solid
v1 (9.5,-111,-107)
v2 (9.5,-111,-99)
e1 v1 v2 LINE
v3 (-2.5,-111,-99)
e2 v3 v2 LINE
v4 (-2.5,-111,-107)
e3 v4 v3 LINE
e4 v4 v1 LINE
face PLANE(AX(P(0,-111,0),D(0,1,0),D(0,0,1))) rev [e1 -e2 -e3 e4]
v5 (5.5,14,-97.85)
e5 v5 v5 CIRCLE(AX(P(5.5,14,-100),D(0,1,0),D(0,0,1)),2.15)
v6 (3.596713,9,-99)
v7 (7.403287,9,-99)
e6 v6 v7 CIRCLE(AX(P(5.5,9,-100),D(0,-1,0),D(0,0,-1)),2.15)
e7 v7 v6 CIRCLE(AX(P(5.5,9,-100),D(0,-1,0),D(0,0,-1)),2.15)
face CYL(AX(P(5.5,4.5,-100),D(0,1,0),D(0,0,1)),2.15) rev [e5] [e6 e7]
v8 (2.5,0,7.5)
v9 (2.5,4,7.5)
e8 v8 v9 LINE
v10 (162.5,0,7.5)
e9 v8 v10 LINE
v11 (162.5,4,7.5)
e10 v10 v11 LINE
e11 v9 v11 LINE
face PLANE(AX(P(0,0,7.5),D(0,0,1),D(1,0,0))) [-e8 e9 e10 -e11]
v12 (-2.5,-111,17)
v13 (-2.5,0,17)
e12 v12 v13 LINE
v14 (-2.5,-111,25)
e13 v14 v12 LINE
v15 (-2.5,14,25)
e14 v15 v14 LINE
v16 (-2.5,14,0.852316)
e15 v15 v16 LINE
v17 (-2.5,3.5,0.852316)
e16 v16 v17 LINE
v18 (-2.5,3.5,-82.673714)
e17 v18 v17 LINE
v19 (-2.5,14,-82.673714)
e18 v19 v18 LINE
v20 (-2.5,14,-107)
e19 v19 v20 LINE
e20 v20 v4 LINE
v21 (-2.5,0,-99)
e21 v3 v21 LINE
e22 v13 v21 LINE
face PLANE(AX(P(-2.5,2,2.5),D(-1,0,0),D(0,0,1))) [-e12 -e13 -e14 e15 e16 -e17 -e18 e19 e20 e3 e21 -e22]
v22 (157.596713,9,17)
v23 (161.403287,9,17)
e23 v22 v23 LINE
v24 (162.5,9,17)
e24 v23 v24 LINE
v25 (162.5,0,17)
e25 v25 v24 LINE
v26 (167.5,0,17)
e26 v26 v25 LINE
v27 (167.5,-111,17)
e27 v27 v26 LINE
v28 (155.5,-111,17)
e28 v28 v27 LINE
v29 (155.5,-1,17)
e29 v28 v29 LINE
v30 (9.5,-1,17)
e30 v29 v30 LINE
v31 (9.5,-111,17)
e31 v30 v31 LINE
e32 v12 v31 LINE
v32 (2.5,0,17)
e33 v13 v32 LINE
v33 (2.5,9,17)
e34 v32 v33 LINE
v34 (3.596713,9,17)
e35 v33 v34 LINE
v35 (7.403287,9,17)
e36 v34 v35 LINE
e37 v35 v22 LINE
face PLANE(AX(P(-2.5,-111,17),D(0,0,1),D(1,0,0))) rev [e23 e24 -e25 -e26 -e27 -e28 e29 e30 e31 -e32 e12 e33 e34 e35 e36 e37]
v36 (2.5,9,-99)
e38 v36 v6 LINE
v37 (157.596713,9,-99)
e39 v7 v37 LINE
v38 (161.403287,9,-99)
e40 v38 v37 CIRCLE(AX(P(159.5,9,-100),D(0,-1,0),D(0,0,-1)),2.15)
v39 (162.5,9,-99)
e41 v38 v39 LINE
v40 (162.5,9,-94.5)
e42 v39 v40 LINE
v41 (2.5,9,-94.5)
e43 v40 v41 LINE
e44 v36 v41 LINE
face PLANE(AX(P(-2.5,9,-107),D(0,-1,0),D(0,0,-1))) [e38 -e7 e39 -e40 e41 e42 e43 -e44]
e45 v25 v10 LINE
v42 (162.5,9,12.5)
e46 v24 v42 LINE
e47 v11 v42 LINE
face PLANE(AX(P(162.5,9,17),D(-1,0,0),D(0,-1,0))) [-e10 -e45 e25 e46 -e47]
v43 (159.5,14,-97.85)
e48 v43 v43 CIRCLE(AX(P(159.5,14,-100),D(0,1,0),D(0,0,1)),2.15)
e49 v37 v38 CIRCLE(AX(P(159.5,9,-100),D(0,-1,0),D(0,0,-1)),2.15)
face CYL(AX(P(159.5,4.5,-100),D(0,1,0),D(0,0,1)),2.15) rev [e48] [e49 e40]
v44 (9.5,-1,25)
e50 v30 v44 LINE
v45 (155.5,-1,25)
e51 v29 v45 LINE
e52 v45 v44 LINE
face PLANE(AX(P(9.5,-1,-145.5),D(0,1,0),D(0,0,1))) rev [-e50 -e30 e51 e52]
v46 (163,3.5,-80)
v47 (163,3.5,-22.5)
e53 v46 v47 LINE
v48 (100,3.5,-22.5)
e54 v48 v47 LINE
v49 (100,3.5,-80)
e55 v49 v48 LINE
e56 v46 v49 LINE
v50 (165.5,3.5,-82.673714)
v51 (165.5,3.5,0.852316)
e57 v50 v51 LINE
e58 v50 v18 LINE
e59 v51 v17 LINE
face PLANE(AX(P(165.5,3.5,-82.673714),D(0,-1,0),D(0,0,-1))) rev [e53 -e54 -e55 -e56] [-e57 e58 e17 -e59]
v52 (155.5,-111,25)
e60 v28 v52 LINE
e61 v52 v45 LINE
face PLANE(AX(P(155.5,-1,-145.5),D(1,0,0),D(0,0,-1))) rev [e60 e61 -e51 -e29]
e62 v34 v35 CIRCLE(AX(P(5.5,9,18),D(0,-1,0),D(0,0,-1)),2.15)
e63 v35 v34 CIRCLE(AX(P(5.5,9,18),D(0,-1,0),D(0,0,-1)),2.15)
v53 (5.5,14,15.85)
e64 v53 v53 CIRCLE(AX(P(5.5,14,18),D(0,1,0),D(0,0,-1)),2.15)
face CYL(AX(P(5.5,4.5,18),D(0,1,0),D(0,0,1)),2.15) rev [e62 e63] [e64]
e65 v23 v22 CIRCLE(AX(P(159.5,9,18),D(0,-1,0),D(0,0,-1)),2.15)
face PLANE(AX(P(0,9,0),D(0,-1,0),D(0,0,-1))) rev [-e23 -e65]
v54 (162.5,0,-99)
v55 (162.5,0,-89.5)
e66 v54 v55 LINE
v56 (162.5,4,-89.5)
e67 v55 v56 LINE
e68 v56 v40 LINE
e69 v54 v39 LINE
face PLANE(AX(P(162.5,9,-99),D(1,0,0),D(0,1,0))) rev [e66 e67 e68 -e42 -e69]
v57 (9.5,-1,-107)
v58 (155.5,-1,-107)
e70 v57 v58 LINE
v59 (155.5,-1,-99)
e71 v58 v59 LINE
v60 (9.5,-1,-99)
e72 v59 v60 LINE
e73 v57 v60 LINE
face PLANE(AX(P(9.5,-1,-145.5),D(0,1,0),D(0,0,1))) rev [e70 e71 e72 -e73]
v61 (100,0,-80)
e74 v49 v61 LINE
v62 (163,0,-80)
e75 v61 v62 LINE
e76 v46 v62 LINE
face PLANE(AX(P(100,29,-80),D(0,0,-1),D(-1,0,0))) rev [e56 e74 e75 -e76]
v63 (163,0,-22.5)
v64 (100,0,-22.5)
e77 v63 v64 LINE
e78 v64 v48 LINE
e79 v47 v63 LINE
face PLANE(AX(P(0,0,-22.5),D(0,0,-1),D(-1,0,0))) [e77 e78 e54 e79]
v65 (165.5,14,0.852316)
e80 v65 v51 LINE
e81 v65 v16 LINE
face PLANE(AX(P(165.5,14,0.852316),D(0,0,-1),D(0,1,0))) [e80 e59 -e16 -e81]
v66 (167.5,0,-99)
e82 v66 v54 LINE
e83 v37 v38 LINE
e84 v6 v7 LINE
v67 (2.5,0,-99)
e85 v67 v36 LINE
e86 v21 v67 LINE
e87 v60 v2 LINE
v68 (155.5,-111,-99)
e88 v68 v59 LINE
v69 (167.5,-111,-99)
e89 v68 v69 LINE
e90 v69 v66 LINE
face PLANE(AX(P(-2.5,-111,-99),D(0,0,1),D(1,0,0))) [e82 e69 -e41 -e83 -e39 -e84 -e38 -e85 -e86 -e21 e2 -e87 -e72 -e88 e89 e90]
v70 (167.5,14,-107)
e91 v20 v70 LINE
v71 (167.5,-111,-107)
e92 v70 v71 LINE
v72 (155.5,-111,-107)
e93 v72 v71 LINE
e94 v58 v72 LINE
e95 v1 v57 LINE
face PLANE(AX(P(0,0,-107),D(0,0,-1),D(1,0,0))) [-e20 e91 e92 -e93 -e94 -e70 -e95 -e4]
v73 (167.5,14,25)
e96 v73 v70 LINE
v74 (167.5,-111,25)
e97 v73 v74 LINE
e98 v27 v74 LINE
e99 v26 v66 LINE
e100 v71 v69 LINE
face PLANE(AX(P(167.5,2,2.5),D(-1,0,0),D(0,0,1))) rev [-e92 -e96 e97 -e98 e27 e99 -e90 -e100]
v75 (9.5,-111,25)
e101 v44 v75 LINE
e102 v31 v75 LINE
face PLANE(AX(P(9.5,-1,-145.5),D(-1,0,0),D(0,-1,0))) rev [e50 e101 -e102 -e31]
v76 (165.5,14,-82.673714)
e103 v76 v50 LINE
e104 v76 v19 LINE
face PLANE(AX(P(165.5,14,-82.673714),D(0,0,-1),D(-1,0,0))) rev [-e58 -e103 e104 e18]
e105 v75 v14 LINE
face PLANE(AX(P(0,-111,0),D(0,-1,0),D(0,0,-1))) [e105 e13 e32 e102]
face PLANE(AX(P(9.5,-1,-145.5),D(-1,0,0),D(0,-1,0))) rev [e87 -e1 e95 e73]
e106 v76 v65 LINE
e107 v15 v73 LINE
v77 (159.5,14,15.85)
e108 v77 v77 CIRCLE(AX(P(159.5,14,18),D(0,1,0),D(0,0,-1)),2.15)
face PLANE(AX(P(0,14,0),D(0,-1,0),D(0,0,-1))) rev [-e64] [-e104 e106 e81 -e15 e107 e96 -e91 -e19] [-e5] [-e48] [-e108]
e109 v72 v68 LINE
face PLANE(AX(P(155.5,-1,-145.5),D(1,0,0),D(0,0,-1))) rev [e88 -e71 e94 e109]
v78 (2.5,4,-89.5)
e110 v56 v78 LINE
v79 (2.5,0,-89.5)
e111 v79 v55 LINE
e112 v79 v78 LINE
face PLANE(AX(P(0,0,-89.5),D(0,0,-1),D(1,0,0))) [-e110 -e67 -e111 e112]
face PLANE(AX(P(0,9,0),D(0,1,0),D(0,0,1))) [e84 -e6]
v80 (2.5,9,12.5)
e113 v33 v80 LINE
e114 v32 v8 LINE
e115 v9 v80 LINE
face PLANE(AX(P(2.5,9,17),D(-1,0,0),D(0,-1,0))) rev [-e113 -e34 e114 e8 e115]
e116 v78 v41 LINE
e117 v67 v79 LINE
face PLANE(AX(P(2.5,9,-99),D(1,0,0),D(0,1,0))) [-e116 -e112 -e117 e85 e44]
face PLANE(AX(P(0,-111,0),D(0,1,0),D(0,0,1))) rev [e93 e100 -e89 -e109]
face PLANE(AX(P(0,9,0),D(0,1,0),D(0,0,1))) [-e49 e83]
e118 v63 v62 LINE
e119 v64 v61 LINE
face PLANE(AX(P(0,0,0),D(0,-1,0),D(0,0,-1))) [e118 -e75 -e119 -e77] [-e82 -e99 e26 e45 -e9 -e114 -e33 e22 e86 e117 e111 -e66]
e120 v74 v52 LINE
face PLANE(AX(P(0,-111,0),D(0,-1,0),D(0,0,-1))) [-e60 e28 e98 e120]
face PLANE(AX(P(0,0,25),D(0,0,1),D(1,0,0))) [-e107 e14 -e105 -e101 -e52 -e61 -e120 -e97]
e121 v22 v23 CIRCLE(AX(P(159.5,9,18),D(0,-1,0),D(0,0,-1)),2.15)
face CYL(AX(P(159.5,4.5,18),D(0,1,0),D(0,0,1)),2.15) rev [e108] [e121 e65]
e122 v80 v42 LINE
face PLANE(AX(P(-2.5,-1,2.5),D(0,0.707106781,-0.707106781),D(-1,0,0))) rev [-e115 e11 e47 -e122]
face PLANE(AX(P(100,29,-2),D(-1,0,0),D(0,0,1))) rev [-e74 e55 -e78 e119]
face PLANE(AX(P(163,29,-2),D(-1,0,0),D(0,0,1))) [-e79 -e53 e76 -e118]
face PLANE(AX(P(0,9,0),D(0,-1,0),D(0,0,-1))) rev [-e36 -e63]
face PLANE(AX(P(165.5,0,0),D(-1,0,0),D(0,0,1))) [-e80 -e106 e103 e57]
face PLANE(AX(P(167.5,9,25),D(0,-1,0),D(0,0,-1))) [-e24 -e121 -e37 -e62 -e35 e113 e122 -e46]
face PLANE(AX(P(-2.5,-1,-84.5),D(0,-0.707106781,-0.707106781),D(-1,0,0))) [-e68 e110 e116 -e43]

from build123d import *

# Parameters (mm, degrees)
SKETCH1_9_W                                = 170
SKETCH1_9_H                                = 87
BOSS_EXTRUDE5_DEPTH                        = 2
SKETCH1_10_W                               = 63
SKETCH1_10_H                               = 78
CUT_EXTRUDE3_DEPTH                         = 9
SKETCH1_12_W                               = 170
SKETCH1_12_H                               = 87
BOSS_EXTRUDE6_DEPTH                        = 14
SKETCH1_W                                  = 63
SKETCH1_H                                  = 78
CUT_EXTRUDE4_DEPTH                         = 29
SKETCH8_W                                  = 83.526029731
SKETCH8_H                                  = 10.5
CUT_EXTRUDE5_DEPTH                         = 168
BOSS_EXTRUDE10_DEPTH                       = 22.5
CHAMFER1_SIZE                              = 10
CHAMFER2_SIZE                              = 10
SKETCH47_R                                 = 2.15
CUT_EXTRUDE10_DEPTH                        = 9.5
SKETCH37_W                                 = 170
SKETCH37_H                                 = 9
BOSS_EXTRUDE20_DEPTH                       = 5
SKETCH25_W                                 = 170
SKETCH25_H                                 = 8
BOSS_EXTRUDE18_DEPTH                       = 120
SKETCH28_W                                 = 170
SKETCH28_H                                 = 8
BOSS_EXTRUDE19_DEPTH                       = 120
SKETCH43_W                                 = 146
SKETCH43_H                                 = 110
CUT_EXTRUDE9_DEPTH                         = 170.5
SKETCH42_W                                 = 63
SKETCH42_H                                 = 3.5
BOSS_EXTRUDE22_DEPTH                       = 20.5
SKETCH38_W                                 = 5
SKETCH38_H                                 = 9
BOSS_EXTRUDE23_DEPTH                       = 9.5
MIRROR14_AT_THE_SECOND_PLANE_COPY_1_SKET_W = 5
MIRROR14_AT_THE_SECOND_PLANE_COPY_1_SKET_H = 9
MIRROR14_AT_THE_SECOND_PLANE_COPY_1_DEPTH  = 9.5


with BuildPart() as part:
    # Sketch1<9> → Boss-Extrude5 (new body)
    with BuildSketch(Plane(origin=(0, 0, 0), x_dir=(1, 0, 0), z_dir=(0, 1, 0))):
        with Locations((82.5, 41)):
            Rectangle(SKETCH1_9_W, SKETCH1_9_H)
    extrude(amount=BOSS_EXTRUDE5_DEPTH)

    # Sketch1<10> → Cut-Extrude3 (cut)
    with BuildSketch(Plane(origin=(0, 0, 0), x_dir=(1, 0, 0), z_dir=(0, 1, 0))):
        with Locations((131.5, 41)):
            Rectangle(SKETCH1_10_W, SKETCH1_10_H)
    extrude(amount=CUT_EXTRUDE3_DEPTH, mode=Mode.SUBTRACT)

    # Sketch1<12> → Boss-Extrude6 (add)
    with BuildSketch(Plane(origin=(0, 0, 0), x_dir=(1, 0, 0), z_dir=(0, 1, 0))):
        with Locations((82.5, 41)):
            Rectangle(SKETCH1_12_W, SKETCH1_12_H)
    extrude(amount=BOSS_EXTRUDE6_DEPTH)

    # Sketch1 → Cut-Extrude4 (cut)
    with BuildSketch(Plane(origin=(0, 0, 0), x_dir=(1, 0, 0), z_dir=(0, 1, 0))):
        with Locations((131.5, 41)):
            Rectangle(SKETCH1_W, SKETCH1_H)
    extrude(amount=CUT_EXTRUDE4_DEPTH, mode=Mode.SUBTRACT)

    # Sketch8 → Cut-Extrude5 (cut)
    with BuildSketch(Plane.ZY.offset(2.5)):
        with Locations((-40.910699185, 8.75)):
            Rectangle(SKETCH8_W, SKETCH8_H)
    extrude(amount=-CUT_EXTRUDE5_DEPTH, mode=Mode.SUBTRACT)

    # Sketch11 → Boss-Extrude10 (add)
    with BuildSketch(Plane.XY.offset(2.5)):
        Polygon((-2.5, 14), (90, 14), (167.5, 14), (167.5, 9), (90, 9), (-2.5, 9), align=None)
    boss_extrude10 = extrude(amount=BOSS_EXTRUDE10_DEPTH)

    # Mirror10: Boss-Extrude10 across plane
    add(boss_extrude10.mirror(Plane.XY.offset(-41)))

    # Chamfer1
    # the kernel refuses this chamfer: 10 mm, written as the material it adds along each edge
    with BuildSketch(Plane(origin=(-2.5, 9, 2.5), x_dir=(0, -0.9996219169112968, -0.02749587661058636), z_dir=(1, 0, 0))) as chamfer1_piece_1_section:
        Polygon((CHAMFER1_SIZE * 0.999621916911, -CHAMFER1_SIZE * 0.0274958766106), (-CHAMFER1_SIZE * 0.0274958766106, -CHAMFER1_SIZE * 0.999621916911), (0, 0), align=None)
    chamfer1_piece_1 = extrude(amount=170, mode=Mode.PRIVATE)
    chamfer1_piece_1 = split(chamfer1_piece_1, bisect_by=Plane(origin=(82.5, 0, 5.859007471), z_dir=(0, 1, 0)), keep=Keep.TOP, mode=Mode.PRIVATE)
    add(chamfer1_piece_1)

    # Chamfer2
    # the kernel refuses this chamfer: 10 mm, written as the material it adds along each edge
    with BuildSketch(Plane(origin=(-2.5, 9, -84.5), x_dir=(0, 0.027495876610586317, -0.9996219169112968), z_dir=(1, 0, 0))) as chamfer2_piece_1_section:
        Polygon((CHAMFER2_SIZE * 0.999621916911, -CHAMFER2_SIZE * 0.0274958766106), (-CHAMFER2_SIZE * 0.0274958766106, -CHAMFER2_SIZE * 0.999621916911), (0, 0), align=None)
    chamfer2_piece_1 = extrude(amount=170, mode=Mode.PRIVATE)
    chamfer2_piece_1 = split(chamfer2_piece_1, bisect_by=Plane(origin=(82.5, 0, -87.859007471), z_dir=(0, 1, 0)), keep=Keep.TOP, mode=Mode.PRIVATE)
    add(chamfer2_piece_1)

    # Sketch47 → Cut-Extrude10 (cut)
    with BuildSketch(Plane(origin=(0, 14, 0), x_dir=(1, 0, 0), z_dir=(0, 1, 0))):
        with Locations(Location((5.5, 100, 0), (0, 0, 270))):
            Circle(SKETCH47_R)
        with Locations(Location((159.5, 100, 0), (0, 0, 270))):
            Circle(SKETCH47_R)
        with Locations(Location((159.5, -18, 0), (0, 0, 90))):
            Circle(SKETCH47_R)
        with Locations(Location((5.5, -18, 0), (0, 0, 90))):
            Circle(SKETCH47_R)
    extrude(amount=-CUT_EXTRUDE10_DEPTH, mode=Mode.SUBTRACT)

    # Sketch37 → Boss-Extrude20 (add)
    with BuildSketch(Plane.XY.offset(2.5)):
        with Locations((82.5, 4.5)):
            Rectangle(SKETCH37_W, SKETCH37_H)
    boss_extrude20 = extrude(amount=BOSS_EXTRUDE20_DEPTH)

    # Sketch25 → Boss-Extrude18 (add)
    with BuildSketch(Plane.XZ.offset(-9)):
        with Locations((82.5, -103)):
            Rectangle(SKETCH25_W, SKETCH25_H)
    extrude(amount=BOSS_EXTRUDE18_DEPTH)

    # Sketch28 → Boss-Extrude19 (add)
    with BuildSketch(Plane.XZ.offset(-9)):
        with Locations((82.5, 21)):
            Rectangle(SKETCH28_W, SKETCH28_H)
    extrude(amount=BOSS_EXTRUDE19_DEPTH)

    # Mirror11: Boss-Extrude20 across plane
    add(boss_extrude20.mirror(Plane.XY.offset(-41)))

    # Sketch43 → Cut-Extrude9 (cut)
    with BuildSketch(Plane.XY.offset(25)):
        with Locations((82.5, -56)):
            Rectangle(SKETCH43_W, SKETCH43_H)
    extrude(amount=-CUT_EXTRUDE9_DEPTH, mode=Mode.SUBTRACT)

    # Sketch42 → Boss-Extrude22 (add)
    with BuildSketch(Plane(origin=(0, 0, -2), x_dir=(-1, 0, 0), z_dir=(0, 0, -1))):
        with Locations((-131.5, 1.75)):
            Rectangle(SKETCH42_W, SKETCH42_H)
    extrude(amount=BOSS_EXTRUDE22_DEPTH)

    # Sketch38 → Boss-Extrude23 (add)
    with BuildSketch(Plane.XY.offset(7.5)):
        with Locations((0, 4.5)):
            Rectangle(SKETCH38_W, SKETCH38_H)
    boss_extrude23 = extrude(amount=BOSS_EXTRUDE23_DEPTH)

    # Mirror14: Boss-Extrude23 across plane
    add(boss_extrude23.mirror(Plane.XY.offset(-41)))

    # Mirror14 at the second plane: Boss-Extrude23 across plane
    add(boss_extrude23.mirror(Plane.ZY.offset(-82.5)))

    # Mirror14 at the second plane copy 1 sket → Mirror14 at the second plane copy 1 (add)
    with BuildSketch(Plane(origin=(165, 0, -89.5), x_dir=(-1, 0, 0), z_dir=(0, 0, -1))):
        with Locations((0, 4.5)):
            Rectangle(MIRROR14_AT_THE_SECOND_PLANE_COPY_1_SKET_W, MIRROR14_AT_THE_SECOND_PLANE_COPY_1_SKET_H)
    extrude(amount=MIRROR14_AT_THE_SECOND_PLANE_COPY_1_DEPTH)


solid = part.part
